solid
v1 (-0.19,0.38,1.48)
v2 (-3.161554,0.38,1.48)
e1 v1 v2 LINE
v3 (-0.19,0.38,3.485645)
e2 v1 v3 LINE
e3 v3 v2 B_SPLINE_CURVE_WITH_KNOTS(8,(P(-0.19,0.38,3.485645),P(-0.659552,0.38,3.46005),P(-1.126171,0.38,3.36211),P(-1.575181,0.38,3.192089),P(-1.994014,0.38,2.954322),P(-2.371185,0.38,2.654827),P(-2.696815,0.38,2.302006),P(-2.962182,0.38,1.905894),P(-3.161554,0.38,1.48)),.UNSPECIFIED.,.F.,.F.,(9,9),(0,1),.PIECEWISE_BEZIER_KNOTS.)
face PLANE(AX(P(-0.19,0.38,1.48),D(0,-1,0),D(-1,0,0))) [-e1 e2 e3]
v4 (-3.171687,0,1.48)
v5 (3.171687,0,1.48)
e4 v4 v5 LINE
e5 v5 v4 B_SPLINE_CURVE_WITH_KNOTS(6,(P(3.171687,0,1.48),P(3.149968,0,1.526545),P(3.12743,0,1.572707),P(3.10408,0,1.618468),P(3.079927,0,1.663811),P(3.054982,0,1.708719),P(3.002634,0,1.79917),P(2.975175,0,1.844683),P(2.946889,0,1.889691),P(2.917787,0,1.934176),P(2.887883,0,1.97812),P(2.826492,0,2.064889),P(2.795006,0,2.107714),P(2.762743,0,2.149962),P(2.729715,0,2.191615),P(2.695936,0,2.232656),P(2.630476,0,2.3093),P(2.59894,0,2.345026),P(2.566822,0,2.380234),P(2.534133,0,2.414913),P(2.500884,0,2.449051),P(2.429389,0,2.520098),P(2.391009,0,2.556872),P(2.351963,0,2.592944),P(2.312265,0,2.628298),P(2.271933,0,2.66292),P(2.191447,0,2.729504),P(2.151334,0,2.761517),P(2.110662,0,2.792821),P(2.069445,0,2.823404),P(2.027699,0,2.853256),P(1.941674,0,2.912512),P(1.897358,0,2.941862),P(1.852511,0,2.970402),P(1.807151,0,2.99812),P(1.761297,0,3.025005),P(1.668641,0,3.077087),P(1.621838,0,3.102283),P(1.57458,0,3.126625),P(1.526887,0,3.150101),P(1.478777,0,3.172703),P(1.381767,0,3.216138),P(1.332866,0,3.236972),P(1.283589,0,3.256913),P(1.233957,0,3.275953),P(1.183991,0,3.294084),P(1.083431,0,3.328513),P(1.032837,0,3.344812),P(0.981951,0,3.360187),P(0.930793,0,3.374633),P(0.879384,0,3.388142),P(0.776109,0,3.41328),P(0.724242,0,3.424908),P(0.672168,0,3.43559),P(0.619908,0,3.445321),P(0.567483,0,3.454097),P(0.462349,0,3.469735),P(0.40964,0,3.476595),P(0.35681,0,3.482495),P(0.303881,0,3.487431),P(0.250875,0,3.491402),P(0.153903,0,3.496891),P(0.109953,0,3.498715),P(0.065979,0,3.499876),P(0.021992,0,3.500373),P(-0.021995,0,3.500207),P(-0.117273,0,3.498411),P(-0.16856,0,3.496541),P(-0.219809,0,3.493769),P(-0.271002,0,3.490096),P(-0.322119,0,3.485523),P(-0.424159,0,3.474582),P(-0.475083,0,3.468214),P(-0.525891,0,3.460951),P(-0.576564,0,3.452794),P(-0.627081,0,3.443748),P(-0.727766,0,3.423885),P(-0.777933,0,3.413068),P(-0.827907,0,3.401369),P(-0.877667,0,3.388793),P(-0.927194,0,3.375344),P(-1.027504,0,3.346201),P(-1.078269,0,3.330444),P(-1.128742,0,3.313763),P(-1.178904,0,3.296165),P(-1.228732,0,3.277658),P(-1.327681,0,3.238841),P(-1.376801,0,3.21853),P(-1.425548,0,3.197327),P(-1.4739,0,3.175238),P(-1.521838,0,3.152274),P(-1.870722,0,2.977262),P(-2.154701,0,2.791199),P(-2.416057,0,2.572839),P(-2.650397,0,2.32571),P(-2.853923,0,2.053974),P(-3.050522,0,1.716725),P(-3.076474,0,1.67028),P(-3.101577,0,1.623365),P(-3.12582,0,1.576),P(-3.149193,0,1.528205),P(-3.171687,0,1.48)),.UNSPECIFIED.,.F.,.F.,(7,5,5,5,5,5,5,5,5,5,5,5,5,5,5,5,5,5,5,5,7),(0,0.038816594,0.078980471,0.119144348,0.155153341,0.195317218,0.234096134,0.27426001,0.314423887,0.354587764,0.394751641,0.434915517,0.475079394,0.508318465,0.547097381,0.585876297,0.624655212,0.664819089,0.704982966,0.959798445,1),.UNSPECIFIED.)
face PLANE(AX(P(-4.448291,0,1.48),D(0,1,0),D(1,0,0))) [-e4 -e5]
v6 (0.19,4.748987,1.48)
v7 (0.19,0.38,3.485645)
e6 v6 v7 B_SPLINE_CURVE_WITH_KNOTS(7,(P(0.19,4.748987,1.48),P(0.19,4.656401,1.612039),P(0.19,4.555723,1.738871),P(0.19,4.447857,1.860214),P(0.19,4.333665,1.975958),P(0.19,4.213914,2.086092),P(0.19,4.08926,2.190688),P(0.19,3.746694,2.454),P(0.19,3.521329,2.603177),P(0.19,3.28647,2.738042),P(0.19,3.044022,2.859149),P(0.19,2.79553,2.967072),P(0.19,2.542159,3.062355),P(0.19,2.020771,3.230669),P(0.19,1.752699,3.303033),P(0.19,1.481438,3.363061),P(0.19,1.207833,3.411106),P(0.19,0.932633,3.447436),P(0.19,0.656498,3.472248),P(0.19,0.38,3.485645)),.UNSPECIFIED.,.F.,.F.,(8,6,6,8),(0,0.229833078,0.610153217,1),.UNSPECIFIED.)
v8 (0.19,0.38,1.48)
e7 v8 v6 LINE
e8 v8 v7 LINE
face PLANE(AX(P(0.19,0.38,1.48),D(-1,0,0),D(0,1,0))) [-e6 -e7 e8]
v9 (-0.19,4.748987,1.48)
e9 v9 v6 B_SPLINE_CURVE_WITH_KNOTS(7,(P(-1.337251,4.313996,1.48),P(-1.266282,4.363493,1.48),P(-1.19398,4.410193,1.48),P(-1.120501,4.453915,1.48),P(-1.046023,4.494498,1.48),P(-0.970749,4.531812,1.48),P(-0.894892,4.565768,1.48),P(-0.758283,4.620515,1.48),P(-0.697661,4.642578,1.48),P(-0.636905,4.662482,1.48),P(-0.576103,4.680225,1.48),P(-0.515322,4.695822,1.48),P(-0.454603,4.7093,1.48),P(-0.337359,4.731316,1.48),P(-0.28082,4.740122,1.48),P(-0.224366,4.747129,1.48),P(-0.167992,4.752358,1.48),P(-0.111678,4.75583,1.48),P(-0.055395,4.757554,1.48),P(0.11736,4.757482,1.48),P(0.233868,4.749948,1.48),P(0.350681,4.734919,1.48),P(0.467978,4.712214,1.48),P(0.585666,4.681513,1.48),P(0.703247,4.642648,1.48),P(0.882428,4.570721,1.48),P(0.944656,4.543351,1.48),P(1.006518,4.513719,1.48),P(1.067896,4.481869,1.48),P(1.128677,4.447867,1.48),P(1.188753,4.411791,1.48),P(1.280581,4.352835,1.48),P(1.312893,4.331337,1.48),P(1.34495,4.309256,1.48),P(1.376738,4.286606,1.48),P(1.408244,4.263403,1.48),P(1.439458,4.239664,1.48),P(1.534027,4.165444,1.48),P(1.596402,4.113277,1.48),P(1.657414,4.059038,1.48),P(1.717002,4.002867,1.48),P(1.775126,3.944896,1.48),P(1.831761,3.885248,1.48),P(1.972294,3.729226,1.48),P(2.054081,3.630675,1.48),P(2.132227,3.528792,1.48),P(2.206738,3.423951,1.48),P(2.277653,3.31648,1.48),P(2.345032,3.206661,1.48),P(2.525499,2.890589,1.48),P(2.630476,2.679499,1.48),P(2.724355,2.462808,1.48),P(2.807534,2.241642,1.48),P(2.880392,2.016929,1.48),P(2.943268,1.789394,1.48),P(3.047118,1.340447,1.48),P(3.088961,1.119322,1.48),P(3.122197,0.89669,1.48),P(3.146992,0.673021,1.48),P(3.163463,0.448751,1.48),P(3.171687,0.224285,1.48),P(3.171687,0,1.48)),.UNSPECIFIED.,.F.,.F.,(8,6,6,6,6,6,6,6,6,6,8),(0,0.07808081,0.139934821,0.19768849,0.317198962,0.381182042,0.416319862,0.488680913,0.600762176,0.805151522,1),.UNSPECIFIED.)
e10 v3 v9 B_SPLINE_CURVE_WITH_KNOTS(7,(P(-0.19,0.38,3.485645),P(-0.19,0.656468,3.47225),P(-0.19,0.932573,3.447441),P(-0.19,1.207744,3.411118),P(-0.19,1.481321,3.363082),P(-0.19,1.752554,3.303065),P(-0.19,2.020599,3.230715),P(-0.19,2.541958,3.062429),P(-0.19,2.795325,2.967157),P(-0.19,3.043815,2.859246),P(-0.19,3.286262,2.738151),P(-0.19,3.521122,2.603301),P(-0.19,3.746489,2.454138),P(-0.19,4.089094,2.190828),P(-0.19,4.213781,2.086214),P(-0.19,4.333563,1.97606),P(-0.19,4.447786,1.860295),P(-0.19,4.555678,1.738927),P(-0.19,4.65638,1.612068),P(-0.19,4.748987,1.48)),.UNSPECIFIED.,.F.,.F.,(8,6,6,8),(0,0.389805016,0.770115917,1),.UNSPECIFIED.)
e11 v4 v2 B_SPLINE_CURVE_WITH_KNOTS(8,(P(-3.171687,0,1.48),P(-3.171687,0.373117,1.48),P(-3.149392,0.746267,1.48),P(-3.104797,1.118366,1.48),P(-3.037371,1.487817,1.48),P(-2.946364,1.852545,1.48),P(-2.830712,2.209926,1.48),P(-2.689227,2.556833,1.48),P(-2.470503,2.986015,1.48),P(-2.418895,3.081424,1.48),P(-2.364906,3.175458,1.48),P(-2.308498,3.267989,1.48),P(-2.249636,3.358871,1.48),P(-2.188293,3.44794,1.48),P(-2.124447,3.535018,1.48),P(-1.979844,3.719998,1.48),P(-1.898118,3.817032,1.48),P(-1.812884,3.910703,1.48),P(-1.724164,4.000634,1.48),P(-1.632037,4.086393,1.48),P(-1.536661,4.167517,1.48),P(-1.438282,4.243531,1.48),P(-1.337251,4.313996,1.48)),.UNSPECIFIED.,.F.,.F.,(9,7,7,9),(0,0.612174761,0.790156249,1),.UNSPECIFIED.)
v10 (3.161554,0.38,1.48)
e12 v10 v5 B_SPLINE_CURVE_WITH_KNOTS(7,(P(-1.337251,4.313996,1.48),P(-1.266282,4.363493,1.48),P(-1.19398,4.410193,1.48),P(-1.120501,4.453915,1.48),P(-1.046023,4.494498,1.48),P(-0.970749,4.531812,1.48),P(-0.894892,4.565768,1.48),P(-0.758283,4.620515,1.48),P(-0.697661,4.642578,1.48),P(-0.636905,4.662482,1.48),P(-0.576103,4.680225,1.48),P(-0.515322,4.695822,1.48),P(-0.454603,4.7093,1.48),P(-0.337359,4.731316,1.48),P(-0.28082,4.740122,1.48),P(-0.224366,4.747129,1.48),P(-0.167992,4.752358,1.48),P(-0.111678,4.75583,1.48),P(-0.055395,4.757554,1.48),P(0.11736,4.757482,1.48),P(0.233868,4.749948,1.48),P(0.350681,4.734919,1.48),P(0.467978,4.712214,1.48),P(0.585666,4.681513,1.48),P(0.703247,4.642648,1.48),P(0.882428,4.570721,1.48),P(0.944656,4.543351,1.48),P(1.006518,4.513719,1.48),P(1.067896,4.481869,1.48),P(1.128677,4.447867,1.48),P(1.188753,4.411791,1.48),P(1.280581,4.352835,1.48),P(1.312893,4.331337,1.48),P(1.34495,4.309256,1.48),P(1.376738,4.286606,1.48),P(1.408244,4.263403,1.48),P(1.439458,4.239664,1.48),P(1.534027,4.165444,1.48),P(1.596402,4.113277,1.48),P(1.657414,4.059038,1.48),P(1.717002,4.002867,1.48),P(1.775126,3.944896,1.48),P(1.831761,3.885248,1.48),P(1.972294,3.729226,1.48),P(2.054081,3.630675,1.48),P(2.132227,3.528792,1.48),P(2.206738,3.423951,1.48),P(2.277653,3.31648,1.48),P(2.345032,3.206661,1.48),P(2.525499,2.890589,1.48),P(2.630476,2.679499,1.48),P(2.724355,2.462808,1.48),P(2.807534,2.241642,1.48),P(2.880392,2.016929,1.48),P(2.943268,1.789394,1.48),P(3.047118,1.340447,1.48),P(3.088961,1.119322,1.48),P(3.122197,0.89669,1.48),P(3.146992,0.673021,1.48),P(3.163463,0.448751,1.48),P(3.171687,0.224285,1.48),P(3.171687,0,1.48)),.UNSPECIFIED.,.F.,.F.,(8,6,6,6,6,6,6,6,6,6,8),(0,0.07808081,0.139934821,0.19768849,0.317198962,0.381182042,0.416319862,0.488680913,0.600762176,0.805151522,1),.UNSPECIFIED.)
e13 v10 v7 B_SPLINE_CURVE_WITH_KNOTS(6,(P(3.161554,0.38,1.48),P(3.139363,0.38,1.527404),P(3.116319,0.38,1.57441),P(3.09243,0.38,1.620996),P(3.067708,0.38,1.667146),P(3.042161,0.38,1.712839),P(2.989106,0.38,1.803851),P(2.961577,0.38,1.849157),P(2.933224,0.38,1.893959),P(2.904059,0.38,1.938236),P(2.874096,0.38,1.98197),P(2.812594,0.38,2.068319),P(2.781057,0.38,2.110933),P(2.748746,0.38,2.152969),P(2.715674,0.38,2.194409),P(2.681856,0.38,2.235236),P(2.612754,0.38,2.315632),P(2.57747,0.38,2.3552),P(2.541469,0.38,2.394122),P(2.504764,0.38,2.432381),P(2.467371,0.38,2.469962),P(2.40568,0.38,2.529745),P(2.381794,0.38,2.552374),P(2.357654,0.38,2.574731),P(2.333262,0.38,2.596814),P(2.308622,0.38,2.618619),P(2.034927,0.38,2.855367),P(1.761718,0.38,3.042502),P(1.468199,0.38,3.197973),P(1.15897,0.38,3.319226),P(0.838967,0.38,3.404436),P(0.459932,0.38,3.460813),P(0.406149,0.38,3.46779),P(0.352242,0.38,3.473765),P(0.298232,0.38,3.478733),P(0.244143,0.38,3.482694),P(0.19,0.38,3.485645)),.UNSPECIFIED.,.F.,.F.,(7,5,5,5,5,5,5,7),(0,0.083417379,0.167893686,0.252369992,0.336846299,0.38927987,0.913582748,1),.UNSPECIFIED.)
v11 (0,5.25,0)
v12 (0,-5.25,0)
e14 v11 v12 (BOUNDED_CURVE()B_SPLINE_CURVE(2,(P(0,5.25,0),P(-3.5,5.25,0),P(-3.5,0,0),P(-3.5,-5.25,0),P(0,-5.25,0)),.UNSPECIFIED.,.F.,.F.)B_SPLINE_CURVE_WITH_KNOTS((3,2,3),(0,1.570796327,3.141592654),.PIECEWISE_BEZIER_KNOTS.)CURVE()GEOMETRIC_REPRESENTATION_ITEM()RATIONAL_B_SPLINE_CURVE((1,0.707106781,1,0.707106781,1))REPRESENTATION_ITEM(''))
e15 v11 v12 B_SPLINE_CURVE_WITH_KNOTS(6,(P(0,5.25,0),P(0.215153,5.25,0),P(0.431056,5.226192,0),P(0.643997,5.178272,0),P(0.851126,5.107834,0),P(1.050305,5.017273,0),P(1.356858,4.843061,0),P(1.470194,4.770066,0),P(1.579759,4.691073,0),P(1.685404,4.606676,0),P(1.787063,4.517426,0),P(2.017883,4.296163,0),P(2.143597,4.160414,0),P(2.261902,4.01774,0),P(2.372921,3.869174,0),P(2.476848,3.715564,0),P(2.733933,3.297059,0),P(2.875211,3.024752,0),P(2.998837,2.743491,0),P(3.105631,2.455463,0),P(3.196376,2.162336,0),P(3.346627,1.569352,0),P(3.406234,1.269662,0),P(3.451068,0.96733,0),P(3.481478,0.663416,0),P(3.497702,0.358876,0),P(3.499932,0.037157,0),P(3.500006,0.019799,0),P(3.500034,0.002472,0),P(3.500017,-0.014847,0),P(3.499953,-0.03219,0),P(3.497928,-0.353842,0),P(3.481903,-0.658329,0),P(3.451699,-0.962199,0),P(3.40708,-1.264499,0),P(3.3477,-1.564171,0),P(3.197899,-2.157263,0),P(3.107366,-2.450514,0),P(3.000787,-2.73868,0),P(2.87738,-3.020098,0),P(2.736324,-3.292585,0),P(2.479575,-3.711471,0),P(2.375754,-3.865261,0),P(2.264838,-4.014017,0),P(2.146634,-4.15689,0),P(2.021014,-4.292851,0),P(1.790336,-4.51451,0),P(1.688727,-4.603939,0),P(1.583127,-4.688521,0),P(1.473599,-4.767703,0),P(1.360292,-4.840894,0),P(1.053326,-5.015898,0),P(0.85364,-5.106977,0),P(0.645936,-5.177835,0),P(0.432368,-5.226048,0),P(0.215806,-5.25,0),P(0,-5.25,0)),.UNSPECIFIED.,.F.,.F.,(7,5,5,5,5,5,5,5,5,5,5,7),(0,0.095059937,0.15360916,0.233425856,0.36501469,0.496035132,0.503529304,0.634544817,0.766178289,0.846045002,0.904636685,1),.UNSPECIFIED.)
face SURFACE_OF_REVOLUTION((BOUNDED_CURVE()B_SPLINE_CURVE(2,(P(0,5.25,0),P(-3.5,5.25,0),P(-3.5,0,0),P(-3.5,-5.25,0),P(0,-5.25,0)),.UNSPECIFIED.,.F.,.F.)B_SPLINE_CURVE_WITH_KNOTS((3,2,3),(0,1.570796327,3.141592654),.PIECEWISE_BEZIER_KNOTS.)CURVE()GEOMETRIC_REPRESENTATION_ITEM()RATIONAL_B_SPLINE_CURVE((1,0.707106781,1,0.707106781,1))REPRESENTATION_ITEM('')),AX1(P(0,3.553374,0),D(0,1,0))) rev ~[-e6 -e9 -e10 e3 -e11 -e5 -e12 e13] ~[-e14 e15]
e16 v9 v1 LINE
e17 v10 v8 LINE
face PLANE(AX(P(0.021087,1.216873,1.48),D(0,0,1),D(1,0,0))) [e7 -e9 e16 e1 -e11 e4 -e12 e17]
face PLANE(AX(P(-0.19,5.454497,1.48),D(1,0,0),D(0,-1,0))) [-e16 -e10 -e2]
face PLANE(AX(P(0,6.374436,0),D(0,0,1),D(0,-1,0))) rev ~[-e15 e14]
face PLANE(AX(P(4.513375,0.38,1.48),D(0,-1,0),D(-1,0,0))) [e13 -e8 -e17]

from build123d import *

# Parameters (mm, degrees)
F3_DEPTH      = 25
F3_DEPTH_BACK = 25
F5_START      = 1.48
F5_DEPTH      = 10.02


with BuildPart() as f1:
    # F0 (on Top) → F1 (revolve)
    with BuildSketch(Plane.XY):
        with BuildLine():
            Line((0, 1.8567474326), (0, 5.25))
            add(Edge.make_bspline(
                [(0, 5.25), (-3.5, 5.25), (-3.5, 0), (-3.5, -5.25), (0, -5.25)],
                knots=[0, 0, 0, 1.5707963268, 1.5707963268, 3.1415926536, 3.1415926536, 3.1415926536], degree=2, weights=[1, 0.7071067812, 1, 0.7071067812, 1]))
            Line((0, -5.25), (0, 0))
            Line((0, 0), (0, 1.8567474326))
        make_face()
    revolve(axis=Axis((0, 3.5533737163, 0), (0, 1, 0)))

    # F2 (on Right) → F3 (cut, two sides)
    with BuildSketch(Plane.YZ) as f3_sk:
        Polygon((6.3744364306, 0), (0, 0), (-6.297763437, 0), (-6.297763437, -3.5955796484), (6.3744364306, -3.5955796484), align=None)
    extrude(amount=-F3_DEPTH, mode=Mode.SUBTRACT)
    extrude(f3_sk.sketch, amount=F3_DEPTH_BACK, mode=Mode.SUBTRACT)

    # F4 (on Top) → F5 (cut)
    with BuildSketch(Plane.XY.offset(F5_START)):
        Polygon((-4.4482909143, 0), (0, 0), (4.5133754611, 0), (4.5133754611, 0.38), (0.1900000061, 0.38), (0.1900000061, 5.200644955), (0.1900000061, 5.4544974118), (-0.19, 5.4544974118), (-0.19, 5.200644955), (-0.19, 0.38), (-4.4482909143, 0.38), align=None)
    extrude(amount=F5_DEPTH, mode=Mode.SUBTRACT)


solid = f1.part
